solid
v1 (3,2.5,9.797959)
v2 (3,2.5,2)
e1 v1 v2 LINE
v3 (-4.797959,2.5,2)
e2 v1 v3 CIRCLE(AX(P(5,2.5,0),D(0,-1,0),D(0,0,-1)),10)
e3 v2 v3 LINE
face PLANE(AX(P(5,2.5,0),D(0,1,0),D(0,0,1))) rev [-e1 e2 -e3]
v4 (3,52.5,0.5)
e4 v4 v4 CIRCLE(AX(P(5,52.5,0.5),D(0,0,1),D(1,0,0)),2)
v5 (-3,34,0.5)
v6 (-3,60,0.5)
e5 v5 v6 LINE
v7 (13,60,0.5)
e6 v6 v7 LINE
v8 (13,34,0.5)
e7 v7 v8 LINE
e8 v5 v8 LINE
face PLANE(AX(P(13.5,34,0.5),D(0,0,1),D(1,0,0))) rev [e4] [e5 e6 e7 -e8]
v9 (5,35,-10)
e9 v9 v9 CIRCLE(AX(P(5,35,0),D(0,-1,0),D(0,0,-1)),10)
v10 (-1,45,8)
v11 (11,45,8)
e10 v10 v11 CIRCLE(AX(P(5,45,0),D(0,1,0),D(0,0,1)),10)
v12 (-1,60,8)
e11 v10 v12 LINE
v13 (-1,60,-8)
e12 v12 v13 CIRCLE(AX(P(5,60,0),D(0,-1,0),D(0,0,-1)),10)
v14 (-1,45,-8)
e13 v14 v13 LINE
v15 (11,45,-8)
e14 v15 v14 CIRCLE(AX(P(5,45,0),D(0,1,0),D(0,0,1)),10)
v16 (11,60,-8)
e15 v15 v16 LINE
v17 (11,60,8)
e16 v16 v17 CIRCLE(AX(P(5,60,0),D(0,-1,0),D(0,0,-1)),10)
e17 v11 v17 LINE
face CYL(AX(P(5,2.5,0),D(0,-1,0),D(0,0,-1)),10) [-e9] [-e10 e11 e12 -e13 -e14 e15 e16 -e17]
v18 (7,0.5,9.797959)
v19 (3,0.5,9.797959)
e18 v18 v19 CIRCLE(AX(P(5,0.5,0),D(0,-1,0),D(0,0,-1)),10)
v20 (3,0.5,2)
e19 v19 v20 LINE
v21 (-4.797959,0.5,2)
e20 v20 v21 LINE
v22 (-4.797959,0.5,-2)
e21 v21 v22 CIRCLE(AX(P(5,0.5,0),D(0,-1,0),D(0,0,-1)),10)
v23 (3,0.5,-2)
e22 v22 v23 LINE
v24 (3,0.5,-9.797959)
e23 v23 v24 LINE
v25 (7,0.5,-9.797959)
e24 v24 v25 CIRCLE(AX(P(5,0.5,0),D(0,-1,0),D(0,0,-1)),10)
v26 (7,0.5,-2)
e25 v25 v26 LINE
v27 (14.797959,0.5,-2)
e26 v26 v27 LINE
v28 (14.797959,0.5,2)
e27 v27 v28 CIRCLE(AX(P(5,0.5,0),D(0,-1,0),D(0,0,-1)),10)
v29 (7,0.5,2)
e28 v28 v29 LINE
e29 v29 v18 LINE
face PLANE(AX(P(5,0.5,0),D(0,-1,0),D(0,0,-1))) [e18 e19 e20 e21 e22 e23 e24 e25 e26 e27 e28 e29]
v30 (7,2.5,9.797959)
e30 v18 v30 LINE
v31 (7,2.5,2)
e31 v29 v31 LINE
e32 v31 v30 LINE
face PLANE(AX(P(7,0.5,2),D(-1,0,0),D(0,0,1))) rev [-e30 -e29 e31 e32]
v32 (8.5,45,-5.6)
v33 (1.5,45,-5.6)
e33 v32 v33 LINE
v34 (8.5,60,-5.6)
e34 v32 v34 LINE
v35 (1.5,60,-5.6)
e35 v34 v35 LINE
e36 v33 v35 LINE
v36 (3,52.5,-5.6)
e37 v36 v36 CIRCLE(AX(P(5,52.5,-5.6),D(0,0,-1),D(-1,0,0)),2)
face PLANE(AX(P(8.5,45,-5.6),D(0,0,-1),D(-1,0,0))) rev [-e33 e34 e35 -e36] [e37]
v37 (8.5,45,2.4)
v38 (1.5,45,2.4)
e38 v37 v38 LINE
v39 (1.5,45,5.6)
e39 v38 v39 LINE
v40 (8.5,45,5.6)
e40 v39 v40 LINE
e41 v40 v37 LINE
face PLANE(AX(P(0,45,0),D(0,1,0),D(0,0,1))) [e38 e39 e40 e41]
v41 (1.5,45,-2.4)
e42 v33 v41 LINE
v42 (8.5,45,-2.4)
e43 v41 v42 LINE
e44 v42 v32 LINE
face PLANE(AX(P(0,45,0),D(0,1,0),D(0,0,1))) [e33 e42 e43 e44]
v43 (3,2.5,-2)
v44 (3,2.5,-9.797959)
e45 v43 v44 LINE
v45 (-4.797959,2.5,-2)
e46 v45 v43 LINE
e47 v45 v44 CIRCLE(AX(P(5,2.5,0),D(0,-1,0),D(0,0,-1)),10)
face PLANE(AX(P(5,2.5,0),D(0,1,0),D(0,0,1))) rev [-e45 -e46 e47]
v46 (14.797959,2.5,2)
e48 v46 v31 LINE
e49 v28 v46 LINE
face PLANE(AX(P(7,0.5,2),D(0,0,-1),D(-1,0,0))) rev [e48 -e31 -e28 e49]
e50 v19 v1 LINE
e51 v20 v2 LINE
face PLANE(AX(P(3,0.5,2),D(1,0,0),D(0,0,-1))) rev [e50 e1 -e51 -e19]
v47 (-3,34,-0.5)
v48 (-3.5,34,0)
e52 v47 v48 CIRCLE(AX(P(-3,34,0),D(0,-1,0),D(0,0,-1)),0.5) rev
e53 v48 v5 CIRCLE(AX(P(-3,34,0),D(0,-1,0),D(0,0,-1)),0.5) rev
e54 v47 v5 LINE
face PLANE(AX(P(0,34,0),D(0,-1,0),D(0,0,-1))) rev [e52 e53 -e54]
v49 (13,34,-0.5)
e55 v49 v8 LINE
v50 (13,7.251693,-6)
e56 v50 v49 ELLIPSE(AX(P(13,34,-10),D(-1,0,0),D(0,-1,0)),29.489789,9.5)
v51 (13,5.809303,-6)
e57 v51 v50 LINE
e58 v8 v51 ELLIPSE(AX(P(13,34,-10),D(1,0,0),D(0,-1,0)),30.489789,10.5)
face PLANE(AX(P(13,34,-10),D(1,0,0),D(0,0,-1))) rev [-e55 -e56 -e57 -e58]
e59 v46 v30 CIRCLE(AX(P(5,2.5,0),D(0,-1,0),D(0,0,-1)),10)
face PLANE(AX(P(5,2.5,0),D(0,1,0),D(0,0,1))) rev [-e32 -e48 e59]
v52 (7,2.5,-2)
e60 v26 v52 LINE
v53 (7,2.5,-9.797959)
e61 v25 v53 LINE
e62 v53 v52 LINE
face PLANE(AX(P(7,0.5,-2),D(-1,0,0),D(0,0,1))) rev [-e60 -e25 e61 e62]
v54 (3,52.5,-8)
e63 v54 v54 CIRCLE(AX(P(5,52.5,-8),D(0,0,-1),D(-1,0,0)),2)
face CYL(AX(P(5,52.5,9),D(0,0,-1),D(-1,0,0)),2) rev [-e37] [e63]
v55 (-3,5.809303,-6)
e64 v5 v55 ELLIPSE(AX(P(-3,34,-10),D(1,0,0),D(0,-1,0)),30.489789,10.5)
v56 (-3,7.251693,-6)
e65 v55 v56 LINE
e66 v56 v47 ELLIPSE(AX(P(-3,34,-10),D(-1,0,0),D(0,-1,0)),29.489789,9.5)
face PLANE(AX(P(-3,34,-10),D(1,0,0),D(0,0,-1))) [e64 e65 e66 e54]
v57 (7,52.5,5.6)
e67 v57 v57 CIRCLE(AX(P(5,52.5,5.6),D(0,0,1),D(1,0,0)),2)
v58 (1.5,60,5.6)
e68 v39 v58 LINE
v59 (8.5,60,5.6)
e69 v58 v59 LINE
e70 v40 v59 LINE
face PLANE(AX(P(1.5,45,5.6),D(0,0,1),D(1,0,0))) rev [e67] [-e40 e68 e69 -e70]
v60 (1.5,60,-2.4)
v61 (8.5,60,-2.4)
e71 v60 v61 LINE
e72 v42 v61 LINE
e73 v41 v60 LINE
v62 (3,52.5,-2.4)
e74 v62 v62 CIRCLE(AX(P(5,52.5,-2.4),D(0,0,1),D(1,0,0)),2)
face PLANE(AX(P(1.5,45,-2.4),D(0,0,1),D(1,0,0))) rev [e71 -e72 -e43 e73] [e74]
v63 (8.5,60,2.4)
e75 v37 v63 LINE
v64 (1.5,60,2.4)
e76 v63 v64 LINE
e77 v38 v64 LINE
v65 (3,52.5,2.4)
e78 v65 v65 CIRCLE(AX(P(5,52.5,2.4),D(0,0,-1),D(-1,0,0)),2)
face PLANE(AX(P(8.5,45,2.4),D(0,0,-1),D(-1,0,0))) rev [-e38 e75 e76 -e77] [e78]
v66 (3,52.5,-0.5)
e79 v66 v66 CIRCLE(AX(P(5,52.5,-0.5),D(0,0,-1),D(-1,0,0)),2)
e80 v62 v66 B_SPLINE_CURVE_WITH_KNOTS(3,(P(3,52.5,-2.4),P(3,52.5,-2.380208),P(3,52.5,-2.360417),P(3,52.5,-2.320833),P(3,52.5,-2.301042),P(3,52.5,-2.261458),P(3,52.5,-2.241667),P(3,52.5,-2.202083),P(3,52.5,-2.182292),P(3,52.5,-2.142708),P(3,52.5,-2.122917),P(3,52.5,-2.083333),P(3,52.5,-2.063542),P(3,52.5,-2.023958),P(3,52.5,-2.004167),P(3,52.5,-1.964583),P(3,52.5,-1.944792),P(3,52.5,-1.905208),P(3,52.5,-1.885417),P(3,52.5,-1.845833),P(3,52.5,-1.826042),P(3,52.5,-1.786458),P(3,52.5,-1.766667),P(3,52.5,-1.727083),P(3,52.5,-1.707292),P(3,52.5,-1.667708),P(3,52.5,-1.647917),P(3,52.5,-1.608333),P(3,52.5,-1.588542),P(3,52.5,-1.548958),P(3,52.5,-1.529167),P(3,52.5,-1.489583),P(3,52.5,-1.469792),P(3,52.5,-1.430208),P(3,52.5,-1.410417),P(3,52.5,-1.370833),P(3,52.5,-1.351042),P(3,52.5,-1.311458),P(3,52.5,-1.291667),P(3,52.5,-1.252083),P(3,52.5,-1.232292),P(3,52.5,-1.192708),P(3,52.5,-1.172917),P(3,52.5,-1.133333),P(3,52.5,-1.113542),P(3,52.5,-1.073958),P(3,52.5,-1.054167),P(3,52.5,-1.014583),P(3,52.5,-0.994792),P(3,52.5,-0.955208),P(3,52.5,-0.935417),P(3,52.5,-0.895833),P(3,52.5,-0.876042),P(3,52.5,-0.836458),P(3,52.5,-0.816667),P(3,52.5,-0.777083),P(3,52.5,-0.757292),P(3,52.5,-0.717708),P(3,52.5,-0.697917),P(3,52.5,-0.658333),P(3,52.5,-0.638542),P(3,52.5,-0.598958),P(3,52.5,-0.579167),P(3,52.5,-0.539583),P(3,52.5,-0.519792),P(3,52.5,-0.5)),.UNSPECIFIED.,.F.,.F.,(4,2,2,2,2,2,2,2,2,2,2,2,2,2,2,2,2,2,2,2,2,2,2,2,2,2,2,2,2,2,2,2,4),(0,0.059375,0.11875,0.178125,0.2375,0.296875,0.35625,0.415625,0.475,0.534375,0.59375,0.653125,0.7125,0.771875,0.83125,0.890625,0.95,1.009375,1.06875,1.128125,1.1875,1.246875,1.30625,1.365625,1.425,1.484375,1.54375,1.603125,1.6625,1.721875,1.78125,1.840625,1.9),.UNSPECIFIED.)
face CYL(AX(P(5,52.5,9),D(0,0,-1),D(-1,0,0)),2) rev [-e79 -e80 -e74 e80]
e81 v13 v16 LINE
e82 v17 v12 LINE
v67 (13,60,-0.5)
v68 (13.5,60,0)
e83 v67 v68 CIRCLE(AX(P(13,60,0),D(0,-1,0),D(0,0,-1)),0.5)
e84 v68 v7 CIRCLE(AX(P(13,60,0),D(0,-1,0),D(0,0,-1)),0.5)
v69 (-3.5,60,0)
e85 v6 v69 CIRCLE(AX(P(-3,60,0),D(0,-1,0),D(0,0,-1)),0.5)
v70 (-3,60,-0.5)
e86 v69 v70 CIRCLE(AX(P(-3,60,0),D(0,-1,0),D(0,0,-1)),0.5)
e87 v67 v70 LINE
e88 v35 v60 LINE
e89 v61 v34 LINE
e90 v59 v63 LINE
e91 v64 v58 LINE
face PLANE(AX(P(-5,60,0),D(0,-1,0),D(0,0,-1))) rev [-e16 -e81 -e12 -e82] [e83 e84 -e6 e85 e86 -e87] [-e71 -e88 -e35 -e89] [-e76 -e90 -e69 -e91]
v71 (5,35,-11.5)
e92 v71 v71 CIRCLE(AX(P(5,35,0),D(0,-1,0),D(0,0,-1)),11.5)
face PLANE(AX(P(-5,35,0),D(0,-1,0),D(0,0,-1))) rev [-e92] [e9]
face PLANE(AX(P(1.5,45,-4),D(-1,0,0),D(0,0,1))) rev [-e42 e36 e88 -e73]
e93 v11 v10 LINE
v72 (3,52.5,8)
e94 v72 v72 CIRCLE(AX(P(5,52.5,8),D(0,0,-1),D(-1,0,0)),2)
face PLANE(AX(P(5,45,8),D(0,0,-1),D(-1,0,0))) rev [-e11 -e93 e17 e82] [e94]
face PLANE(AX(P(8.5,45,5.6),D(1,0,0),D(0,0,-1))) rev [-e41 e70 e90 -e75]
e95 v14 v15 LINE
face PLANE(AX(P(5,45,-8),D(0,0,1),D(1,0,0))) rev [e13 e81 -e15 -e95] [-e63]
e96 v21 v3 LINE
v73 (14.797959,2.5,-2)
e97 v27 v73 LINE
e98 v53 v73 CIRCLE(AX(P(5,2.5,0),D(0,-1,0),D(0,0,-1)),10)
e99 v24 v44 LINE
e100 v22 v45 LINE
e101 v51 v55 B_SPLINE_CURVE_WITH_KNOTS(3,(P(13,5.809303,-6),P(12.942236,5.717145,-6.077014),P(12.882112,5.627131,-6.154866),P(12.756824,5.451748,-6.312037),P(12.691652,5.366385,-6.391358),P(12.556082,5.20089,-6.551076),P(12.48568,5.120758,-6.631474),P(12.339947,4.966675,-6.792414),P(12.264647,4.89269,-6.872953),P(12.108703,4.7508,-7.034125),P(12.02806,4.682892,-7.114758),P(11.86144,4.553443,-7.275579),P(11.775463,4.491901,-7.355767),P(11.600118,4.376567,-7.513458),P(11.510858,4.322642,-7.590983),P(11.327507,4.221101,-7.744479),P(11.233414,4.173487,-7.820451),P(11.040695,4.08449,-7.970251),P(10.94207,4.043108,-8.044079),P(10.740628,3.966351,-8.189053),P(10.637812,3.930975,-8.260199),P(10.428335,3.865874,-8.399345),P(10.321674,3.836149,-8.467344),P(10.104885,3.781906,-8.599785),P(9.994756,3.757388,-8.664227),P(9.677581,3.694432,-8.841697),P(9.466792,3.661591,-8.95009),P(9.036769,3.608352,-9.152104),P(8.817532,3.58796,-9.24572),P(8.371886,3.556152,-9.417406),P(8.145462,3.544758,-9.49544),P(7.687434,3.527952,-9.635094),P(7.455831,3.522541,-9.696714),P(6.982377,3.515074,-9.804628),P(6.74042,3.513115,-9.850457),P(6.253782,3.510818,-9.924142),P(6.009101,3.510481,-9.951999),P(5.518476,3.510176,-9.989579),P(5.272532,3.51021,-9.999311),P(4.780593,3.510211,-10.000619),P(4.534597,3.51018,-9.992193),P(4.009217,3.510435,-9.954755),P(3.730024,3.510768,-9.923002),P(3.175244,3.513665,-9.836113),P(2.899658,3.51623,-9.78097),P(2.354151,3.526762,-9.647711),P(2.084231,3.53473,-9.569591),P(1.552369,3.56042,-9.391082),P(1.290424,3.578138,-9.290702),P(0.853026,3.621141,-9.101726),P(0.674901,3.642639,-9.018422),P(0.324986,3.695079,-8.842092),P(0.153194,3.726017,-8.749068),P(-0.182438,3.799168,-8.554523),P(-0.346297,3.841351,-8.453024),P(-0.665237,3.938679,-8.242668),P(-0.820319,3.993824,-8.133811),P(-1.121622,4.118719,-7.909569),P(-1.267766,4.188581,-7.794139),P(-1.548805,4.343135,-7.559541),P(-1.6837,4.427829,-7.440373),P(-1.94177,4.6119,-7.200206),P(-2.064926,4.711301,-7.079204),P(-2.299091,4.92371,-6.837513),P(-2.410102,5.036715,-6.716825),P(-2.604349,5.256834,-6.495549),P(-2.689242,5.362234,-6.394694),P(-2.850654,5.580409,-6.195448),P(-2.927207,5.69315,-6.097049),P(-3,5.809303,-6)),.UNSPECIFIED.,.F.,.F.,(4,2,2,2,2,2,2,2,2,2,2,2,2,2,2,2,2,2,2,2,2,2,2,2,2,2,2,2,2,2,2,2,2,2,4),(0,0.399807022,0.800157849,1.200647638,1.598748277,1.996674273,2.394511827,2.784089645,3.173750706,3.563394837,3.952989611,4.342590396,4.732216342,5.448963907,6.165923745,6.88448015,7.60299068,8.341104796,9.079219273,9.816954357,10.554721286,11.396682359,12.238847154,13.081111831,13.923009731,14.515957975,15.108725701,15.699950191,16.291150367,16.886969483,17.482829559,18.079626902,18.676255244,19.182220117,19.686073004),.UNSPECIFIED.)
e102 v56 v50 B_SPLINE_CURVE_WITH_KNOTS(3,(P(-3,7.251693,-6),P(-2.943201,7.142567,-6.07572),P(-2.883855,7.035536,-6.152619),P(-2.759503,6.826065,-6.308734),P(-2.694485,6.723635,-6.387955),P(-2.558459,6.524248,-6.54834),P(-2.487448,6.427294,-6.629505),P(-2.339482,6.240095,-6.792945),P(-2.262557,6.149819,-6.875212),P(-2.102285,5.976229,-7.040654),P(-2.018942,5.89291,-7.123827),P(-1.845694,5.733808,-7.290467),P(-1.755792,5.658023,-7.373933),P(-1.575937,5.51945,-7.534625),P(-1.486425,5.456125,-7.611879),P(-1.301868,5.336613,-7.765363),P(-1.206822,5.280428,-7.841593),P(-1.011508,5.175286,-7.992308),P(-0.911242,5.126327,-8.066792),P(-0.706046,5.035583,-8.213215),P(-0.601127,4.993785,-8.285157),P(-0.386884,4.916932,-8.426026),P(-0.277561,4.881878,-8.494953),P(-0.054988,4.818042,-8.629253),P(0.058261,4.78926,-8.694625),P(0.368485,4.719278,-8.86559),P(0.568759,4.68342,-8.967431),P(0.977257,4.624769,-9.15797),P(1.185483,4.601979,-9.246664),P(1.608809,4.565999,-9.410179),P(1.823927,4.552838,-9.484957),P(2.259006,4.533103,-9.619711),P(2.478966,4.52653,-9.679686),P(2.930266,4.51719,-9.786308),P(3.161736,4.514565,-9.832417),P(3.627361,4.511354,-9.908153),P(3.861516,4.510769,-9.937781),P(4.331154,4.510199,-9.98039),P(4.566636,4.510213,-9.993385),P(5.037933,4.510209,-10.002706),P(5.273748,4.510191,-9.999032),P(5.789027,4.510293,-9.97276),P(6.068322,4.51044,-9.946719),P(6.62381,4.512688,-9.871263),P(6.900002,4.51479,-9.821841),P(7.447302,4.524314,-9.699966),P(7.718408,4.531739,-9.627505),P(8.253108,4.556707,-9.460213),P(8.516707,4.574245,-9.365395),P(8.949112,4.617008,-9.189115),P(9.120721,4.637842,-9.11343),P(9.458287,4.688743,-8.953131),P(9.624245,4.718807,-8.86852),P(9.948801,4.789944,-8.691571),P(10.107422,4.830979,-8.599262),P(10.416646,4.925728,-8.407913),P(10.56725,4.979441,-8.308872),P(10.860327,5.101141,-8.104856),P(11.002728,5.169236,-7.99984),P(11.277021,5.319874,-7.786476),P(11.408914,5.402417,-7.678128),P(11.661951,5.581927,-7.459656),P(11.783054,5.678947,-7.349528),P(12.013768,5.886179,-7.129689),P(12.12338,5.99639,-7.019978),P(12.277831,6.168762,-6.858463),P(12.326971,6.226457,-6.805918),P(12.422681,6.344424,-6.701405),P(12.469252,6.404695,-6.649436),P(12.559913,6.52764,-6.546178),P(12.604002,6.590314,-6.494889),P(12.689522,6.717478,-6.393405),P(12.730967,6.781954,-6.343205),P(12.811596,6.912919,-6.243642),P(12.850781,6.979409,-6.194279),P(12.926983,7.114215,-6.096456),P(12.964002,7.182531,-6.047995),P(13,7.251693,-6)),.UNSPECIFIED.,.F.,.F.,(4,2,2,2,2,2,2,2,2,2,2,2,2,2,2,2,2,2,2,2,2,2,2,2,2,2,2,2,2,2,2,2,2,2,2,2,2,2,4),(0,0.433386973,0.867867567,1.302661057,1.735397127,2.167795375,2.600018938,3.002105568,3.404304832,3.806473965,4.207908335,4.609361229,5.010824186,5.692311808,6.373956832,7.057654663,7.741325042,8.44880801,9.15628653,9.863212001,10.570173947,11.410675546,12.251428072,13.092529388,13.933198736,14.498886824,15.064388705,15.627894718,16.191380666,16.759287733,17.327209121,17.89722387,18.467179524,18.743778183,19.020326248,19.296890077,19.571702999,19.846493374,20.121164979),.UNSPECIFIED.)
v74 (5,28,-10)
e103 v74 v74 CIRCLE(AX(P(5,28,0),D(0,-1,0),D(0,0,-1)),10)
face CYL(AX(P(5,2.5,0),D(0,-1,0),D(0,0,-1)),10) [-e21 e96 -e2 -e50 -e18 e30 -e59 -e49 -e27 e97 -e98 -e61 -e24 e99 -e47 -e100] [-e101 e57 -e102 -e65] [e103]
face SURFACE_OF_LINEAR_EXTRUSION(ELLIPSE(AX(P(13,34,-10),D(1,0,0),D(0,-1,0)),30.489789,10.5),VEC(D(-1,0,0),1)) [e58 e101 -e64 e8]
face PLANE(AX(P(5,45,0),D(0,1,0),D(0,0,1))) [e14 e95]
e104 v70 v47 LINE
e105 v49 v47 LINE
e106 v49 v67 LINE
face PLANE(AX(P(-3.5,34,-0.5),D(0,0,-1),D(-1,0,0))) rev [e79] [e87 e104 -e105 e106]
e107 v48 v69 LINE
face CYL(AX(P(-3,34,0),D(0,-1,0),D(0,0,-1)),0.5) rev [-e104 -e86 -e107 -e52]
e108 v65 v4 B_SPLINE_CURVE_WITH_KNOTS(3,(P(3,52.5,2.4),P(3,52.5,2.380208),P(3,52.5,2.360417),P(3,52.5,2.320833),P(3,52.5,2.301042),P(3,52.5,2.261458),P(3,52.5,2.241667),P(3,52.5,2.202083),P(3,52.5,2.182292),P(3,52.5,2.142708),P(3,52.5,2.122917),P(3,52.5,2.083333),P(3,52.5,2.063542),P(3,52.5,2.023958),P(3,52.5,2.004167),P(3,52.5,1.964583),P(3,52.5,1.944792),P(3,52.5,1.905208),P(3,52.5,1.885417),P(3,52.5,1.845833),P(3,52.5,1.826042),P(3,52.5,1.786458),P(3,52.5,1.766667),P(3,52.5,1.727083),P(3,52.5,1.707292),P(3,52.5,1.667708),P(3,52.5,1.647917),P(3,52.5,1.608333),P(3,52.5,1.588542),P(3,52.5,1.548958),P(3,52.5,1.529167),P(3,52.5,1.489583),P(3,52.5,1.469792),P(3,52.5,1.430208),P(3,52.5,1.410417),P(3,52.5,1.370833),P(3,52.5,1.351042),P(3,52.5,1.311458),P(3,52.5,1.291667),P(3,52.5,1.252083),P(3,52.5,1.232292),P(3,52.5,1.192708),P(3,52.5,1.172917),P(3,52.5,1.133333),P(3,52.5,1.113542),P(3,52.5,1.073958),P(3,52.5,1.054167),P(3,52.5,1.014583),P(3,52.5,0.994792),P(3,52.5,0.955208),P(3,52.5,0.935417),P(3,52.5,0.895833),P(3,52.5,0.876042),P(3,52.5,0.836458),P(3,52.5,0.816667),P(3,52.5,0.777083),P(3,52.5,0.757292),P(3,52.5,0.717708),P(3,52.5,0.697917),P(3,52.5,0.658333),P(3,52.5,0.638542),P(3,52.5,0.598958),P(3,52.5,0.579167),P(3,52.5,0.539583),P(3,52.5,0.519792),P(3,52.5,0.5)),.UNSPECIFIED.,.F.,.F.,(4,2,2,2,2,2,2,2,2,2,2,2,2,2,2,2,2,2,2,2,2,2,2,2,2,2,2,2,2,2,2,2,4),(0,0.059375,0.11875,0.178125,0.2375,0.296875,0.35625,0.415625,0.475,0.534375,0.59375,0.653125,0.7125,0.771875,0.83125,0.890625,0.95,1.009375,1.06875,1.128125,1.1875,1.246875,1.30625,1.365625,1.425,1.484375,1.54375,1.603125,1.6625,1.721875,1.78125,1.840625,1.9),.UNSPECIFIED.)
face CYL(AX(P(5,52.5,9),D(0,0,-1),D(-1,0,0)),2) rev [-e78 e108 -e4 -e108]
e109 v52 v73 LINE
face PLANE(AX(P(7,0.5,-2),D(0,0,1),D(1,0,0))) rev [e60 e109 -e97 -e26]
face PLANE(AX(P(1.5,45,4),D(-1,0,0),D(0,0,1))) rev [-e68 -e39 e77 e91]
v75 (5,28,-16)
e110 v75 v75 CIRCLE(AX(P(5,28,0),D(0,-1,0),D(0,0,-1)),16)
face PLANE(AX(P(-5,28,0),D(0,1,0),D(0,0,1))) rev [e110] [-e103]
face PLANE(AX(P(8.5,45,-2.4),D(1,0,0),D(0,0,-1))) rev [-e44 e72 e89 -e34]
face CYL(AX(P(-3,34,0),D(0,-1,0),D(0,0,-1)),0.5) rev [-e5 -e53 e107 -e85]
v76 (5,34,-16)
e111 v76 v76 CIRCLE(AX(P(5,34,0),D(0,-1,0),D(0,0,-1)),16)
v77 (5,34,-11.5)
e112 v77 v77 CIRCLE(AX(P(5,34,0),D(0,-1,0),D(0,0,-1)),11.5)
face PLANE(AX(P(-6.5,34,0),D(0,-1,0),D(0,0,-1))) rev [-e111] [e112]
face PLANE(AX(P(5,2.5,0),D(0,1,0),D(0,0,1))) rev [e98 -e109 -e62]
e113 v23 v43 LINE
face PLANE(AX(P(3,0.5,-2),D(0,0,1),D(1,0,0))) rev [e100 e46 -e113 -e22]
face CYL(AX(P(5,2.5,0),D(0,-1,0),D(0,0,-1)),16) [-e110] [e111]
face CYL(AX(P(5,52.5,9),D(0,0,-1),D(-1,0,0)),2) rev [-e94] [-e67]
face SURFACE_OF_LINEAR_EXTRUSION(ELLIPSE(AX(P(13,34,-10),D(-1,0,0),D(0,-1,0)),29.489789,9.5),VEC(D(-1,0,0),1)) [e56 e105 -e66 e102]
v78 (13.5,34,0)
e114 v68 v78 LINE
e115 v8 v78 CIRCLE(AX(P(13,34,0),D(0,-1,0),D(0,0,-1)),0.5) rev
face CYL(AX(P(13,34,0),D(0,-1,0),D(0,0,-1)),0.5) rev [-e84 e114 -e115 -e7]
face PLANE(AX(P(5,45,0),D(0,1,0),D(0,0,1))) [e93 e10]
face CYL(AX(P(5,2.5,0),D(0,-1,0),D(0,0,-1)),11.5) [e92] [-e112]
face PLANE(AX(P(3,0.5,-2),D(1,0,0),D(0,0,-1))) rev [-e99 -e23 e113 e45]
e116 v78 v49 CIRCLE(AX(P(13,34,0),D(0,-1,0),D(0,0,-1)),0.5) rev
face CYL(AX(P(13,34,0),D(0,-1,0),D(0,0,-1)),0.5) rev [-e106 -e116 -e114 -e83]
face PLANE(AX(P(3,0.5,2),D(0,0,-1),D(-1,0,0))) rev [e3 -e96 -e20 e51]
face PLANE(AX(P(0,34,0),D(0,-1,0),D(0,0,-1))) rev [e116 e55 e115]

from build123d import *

# Parameters (mm, degrees)
SKETCH_2_W               = 17
SKETCH_2_H               = 1
CUT_EXTRUDE_1_DEPTH      = 26
FILLET_1_R               = 0.5
CUT_EXTRUDE_START        = -15
CUT_EXTRUDE_2_DEPTH      = 15
CUT_EXTRUDE_3_DEPTH      = 15
SKETCH_5_R               = 2
CUT_EXTRUDE_4_DEPTH      = 17
EXTRUDE_START            = 2
EXTRUDE_1_DEPTH          = 2
CUT_EXTRUDE_5_DEPTH      = 8
CUT_EXTRUDE_5_DEPTH_BACK = 8


with BuildPart() as part:
    # 草图1 → 旋转1 (revolve)
    with BuildSketch(Plane.XY, mode=Mode.PRIVATE) as revolve_1_sk:
        Polygon((5, 2.5), (5, 60), (-5, 60), (-5, 35), (-6.5, 35), (-6.5, 34), (-11, 34), (-11, 28), (-5, 28), (-5, 2.5), align=None)
    revolve(revolve_1_sk.sketch.rotate(Axis((5, 2.5, 0), (0, 1, 0)), 270), axis=Axis((5, 2.5, 0), (0, 1, 0)))

    # 草图2 → 切除-拉伸1 (cut)
    with BuildSketch(Plane(origin=(0, 60, 0), x_dir=(1, 0, 0), z_dir=(0, 1, 0))):
        with Locations((5, 0)):
            Rectangle(SKETCH_2_W, SKETCH_2_H)
    extrude(amount=-CUT_EXTRUDE_1_DEPTH, mode=Mode.SUBTRACT)

    # 圆角1
    fillet_1_edges = [part.edges().sort_by_distance(p)[0] for p in [
        (-3.5, 47, 0.5),
        (-3.5, 47, -0.5),
        (13.5, 47, 0.5),
        (13.5, 47, -0.5),
    ]]
    fillet(fillet_1_edges, radius=FILLET_1_R - 0.0001)  # a hair under: the kernel refuses the full size

    # 草图3 → 切除-拉伸2 (cut)
    with BuildSketch(Plane(origin=(0, 60, 0), x_dir=(1, 0, 0), z_dir=(0, 1, 0)).offset(CUT_EXTRUDE_START)):
        with BuildLine():
            Line((5, -8), (11, -8))
            ThreePointArc((11, -8), (5, -10), (-1, -8))
            Line((-1, -8), (5, -8))
        make_face()
        with BuildLine():
            Line((5, 8), (11, 8))
            ThreePointArc((11, 8), (5, 10), (-1, 8))
            Line((-1, 8), (5, 8))
        make_face()
    extrude(amount=CUT_EXTRUDE_2_DEPTH, mode=Mode.SUBTRACT)

    # 草图4 → 切除-拉伸3 (cut)
    with BuildSketch(Plane(origin=(0, 60, 0), x_dir=(1, 0, 0), z_dir=(0, 1, 0))):
        Polygon((1.5, -2.4), (1.5, -4), (1.5, -5.6), (8.5, -5.6), (8.5, -2.4), align=None)
        Polygon((1.5, 4), (1.5, 2.4), (8.5, 2.4), (8.5, 5.6), (1.5, 5.6), align=None)
    extrude(amount=-CUT_EXTRUDE_3_DEPTH, mode=Mode.SUBTRACT)

    # 草图5 → 切除-拉伸4 (cut)
    with BuildSketch(Plane(origin=(0, 0, -8), x_dir=(-1, 0, 0), z_dir=(0, 0, -1))):
        with Locations((-5, 52.5)):
            Circle(SKETCH_5_R)
    extrude(amount=-CUT_EXTRUDE_4_DEPTH, mode=Mode.SUBTRACT)

    # 草图6 → 凸台-拉伸1 (add)
    with BuildSketch(Plane.XZ.offset(-2.5).offset(EXTRUDE_START)):
        with BuildLine():
            Line((7, 2), (14.797958971, 2))
            ThreePointArc((14.797958971, 2), (15, 0), (14.797958971, -2))
            Line((14.797958971, -2), (7, -2))
            Line((7, -2), (7, -9.797958971))
            ThreePointArc((7, -9.797958971), (5, -10), (3, -9.797958971))
            Line((3, -9.797958971), (3, -2))
            Line((3, -2), (-4.797958971, -2))
            ThreePointArc((-4.797958971, -2), (-5, 0), (-4.797958971, 2))
            Line((-4.797958971, 2), (3, 2))
            Line((3, 2), (3, 9.797958971))
            ThreePointArc((3, 9.797958971), (5, 10), (7, 9.797958971))
            Line((7, 9.797958971), (7, 2))
        make_face()
    extrude(amount=-EXTRUDE_1_DEPTH)

    # 草图7 → 切除-拉伸5 (cut, two sides: drawn at the far end of the back side and taken through both)
    with BuildSketch(Plane(origin=(5, 0, 0), x_dir=(0, 0, -1), z_dir=(1, 0, 0)).offset(-CUT_EXTRUDE_5_DEPTH_BACK)):
        with BuildLine():
            Line((10, 4.510210526), (10, 3.510210526))
            add(Edge.make_bspline(
                [(-0.5, 34), (-0.5, 3.510210526), (10, 3.510210526)],
                knots=[1.570796327, 1.570796327, 1.570796327, 3.141592654, 3.141592654, 3.141592654], degree=2, weights=[1, 0.707106781, 1]))
            Line((-0.5, 34), (0.5, 34))
            add(Edge.make_bspline(
                [(0.5, 34), (0.5, 4.510210526), (10, 4.510210526)],
                knots=[1.570796327, 1.570796327, 1.570796327, 3.141592654, 3.141592654, 3.141592654], degree=2, weights=[1, 0.707106781, 1]))
        make_face()
    extrude(amount=CUT_EXTRUDE_5_DEPTH + CUT_EXTRUDE_5_DEPTH_BACK, mode=Mode.SUBTRACT)


solid = part.part
